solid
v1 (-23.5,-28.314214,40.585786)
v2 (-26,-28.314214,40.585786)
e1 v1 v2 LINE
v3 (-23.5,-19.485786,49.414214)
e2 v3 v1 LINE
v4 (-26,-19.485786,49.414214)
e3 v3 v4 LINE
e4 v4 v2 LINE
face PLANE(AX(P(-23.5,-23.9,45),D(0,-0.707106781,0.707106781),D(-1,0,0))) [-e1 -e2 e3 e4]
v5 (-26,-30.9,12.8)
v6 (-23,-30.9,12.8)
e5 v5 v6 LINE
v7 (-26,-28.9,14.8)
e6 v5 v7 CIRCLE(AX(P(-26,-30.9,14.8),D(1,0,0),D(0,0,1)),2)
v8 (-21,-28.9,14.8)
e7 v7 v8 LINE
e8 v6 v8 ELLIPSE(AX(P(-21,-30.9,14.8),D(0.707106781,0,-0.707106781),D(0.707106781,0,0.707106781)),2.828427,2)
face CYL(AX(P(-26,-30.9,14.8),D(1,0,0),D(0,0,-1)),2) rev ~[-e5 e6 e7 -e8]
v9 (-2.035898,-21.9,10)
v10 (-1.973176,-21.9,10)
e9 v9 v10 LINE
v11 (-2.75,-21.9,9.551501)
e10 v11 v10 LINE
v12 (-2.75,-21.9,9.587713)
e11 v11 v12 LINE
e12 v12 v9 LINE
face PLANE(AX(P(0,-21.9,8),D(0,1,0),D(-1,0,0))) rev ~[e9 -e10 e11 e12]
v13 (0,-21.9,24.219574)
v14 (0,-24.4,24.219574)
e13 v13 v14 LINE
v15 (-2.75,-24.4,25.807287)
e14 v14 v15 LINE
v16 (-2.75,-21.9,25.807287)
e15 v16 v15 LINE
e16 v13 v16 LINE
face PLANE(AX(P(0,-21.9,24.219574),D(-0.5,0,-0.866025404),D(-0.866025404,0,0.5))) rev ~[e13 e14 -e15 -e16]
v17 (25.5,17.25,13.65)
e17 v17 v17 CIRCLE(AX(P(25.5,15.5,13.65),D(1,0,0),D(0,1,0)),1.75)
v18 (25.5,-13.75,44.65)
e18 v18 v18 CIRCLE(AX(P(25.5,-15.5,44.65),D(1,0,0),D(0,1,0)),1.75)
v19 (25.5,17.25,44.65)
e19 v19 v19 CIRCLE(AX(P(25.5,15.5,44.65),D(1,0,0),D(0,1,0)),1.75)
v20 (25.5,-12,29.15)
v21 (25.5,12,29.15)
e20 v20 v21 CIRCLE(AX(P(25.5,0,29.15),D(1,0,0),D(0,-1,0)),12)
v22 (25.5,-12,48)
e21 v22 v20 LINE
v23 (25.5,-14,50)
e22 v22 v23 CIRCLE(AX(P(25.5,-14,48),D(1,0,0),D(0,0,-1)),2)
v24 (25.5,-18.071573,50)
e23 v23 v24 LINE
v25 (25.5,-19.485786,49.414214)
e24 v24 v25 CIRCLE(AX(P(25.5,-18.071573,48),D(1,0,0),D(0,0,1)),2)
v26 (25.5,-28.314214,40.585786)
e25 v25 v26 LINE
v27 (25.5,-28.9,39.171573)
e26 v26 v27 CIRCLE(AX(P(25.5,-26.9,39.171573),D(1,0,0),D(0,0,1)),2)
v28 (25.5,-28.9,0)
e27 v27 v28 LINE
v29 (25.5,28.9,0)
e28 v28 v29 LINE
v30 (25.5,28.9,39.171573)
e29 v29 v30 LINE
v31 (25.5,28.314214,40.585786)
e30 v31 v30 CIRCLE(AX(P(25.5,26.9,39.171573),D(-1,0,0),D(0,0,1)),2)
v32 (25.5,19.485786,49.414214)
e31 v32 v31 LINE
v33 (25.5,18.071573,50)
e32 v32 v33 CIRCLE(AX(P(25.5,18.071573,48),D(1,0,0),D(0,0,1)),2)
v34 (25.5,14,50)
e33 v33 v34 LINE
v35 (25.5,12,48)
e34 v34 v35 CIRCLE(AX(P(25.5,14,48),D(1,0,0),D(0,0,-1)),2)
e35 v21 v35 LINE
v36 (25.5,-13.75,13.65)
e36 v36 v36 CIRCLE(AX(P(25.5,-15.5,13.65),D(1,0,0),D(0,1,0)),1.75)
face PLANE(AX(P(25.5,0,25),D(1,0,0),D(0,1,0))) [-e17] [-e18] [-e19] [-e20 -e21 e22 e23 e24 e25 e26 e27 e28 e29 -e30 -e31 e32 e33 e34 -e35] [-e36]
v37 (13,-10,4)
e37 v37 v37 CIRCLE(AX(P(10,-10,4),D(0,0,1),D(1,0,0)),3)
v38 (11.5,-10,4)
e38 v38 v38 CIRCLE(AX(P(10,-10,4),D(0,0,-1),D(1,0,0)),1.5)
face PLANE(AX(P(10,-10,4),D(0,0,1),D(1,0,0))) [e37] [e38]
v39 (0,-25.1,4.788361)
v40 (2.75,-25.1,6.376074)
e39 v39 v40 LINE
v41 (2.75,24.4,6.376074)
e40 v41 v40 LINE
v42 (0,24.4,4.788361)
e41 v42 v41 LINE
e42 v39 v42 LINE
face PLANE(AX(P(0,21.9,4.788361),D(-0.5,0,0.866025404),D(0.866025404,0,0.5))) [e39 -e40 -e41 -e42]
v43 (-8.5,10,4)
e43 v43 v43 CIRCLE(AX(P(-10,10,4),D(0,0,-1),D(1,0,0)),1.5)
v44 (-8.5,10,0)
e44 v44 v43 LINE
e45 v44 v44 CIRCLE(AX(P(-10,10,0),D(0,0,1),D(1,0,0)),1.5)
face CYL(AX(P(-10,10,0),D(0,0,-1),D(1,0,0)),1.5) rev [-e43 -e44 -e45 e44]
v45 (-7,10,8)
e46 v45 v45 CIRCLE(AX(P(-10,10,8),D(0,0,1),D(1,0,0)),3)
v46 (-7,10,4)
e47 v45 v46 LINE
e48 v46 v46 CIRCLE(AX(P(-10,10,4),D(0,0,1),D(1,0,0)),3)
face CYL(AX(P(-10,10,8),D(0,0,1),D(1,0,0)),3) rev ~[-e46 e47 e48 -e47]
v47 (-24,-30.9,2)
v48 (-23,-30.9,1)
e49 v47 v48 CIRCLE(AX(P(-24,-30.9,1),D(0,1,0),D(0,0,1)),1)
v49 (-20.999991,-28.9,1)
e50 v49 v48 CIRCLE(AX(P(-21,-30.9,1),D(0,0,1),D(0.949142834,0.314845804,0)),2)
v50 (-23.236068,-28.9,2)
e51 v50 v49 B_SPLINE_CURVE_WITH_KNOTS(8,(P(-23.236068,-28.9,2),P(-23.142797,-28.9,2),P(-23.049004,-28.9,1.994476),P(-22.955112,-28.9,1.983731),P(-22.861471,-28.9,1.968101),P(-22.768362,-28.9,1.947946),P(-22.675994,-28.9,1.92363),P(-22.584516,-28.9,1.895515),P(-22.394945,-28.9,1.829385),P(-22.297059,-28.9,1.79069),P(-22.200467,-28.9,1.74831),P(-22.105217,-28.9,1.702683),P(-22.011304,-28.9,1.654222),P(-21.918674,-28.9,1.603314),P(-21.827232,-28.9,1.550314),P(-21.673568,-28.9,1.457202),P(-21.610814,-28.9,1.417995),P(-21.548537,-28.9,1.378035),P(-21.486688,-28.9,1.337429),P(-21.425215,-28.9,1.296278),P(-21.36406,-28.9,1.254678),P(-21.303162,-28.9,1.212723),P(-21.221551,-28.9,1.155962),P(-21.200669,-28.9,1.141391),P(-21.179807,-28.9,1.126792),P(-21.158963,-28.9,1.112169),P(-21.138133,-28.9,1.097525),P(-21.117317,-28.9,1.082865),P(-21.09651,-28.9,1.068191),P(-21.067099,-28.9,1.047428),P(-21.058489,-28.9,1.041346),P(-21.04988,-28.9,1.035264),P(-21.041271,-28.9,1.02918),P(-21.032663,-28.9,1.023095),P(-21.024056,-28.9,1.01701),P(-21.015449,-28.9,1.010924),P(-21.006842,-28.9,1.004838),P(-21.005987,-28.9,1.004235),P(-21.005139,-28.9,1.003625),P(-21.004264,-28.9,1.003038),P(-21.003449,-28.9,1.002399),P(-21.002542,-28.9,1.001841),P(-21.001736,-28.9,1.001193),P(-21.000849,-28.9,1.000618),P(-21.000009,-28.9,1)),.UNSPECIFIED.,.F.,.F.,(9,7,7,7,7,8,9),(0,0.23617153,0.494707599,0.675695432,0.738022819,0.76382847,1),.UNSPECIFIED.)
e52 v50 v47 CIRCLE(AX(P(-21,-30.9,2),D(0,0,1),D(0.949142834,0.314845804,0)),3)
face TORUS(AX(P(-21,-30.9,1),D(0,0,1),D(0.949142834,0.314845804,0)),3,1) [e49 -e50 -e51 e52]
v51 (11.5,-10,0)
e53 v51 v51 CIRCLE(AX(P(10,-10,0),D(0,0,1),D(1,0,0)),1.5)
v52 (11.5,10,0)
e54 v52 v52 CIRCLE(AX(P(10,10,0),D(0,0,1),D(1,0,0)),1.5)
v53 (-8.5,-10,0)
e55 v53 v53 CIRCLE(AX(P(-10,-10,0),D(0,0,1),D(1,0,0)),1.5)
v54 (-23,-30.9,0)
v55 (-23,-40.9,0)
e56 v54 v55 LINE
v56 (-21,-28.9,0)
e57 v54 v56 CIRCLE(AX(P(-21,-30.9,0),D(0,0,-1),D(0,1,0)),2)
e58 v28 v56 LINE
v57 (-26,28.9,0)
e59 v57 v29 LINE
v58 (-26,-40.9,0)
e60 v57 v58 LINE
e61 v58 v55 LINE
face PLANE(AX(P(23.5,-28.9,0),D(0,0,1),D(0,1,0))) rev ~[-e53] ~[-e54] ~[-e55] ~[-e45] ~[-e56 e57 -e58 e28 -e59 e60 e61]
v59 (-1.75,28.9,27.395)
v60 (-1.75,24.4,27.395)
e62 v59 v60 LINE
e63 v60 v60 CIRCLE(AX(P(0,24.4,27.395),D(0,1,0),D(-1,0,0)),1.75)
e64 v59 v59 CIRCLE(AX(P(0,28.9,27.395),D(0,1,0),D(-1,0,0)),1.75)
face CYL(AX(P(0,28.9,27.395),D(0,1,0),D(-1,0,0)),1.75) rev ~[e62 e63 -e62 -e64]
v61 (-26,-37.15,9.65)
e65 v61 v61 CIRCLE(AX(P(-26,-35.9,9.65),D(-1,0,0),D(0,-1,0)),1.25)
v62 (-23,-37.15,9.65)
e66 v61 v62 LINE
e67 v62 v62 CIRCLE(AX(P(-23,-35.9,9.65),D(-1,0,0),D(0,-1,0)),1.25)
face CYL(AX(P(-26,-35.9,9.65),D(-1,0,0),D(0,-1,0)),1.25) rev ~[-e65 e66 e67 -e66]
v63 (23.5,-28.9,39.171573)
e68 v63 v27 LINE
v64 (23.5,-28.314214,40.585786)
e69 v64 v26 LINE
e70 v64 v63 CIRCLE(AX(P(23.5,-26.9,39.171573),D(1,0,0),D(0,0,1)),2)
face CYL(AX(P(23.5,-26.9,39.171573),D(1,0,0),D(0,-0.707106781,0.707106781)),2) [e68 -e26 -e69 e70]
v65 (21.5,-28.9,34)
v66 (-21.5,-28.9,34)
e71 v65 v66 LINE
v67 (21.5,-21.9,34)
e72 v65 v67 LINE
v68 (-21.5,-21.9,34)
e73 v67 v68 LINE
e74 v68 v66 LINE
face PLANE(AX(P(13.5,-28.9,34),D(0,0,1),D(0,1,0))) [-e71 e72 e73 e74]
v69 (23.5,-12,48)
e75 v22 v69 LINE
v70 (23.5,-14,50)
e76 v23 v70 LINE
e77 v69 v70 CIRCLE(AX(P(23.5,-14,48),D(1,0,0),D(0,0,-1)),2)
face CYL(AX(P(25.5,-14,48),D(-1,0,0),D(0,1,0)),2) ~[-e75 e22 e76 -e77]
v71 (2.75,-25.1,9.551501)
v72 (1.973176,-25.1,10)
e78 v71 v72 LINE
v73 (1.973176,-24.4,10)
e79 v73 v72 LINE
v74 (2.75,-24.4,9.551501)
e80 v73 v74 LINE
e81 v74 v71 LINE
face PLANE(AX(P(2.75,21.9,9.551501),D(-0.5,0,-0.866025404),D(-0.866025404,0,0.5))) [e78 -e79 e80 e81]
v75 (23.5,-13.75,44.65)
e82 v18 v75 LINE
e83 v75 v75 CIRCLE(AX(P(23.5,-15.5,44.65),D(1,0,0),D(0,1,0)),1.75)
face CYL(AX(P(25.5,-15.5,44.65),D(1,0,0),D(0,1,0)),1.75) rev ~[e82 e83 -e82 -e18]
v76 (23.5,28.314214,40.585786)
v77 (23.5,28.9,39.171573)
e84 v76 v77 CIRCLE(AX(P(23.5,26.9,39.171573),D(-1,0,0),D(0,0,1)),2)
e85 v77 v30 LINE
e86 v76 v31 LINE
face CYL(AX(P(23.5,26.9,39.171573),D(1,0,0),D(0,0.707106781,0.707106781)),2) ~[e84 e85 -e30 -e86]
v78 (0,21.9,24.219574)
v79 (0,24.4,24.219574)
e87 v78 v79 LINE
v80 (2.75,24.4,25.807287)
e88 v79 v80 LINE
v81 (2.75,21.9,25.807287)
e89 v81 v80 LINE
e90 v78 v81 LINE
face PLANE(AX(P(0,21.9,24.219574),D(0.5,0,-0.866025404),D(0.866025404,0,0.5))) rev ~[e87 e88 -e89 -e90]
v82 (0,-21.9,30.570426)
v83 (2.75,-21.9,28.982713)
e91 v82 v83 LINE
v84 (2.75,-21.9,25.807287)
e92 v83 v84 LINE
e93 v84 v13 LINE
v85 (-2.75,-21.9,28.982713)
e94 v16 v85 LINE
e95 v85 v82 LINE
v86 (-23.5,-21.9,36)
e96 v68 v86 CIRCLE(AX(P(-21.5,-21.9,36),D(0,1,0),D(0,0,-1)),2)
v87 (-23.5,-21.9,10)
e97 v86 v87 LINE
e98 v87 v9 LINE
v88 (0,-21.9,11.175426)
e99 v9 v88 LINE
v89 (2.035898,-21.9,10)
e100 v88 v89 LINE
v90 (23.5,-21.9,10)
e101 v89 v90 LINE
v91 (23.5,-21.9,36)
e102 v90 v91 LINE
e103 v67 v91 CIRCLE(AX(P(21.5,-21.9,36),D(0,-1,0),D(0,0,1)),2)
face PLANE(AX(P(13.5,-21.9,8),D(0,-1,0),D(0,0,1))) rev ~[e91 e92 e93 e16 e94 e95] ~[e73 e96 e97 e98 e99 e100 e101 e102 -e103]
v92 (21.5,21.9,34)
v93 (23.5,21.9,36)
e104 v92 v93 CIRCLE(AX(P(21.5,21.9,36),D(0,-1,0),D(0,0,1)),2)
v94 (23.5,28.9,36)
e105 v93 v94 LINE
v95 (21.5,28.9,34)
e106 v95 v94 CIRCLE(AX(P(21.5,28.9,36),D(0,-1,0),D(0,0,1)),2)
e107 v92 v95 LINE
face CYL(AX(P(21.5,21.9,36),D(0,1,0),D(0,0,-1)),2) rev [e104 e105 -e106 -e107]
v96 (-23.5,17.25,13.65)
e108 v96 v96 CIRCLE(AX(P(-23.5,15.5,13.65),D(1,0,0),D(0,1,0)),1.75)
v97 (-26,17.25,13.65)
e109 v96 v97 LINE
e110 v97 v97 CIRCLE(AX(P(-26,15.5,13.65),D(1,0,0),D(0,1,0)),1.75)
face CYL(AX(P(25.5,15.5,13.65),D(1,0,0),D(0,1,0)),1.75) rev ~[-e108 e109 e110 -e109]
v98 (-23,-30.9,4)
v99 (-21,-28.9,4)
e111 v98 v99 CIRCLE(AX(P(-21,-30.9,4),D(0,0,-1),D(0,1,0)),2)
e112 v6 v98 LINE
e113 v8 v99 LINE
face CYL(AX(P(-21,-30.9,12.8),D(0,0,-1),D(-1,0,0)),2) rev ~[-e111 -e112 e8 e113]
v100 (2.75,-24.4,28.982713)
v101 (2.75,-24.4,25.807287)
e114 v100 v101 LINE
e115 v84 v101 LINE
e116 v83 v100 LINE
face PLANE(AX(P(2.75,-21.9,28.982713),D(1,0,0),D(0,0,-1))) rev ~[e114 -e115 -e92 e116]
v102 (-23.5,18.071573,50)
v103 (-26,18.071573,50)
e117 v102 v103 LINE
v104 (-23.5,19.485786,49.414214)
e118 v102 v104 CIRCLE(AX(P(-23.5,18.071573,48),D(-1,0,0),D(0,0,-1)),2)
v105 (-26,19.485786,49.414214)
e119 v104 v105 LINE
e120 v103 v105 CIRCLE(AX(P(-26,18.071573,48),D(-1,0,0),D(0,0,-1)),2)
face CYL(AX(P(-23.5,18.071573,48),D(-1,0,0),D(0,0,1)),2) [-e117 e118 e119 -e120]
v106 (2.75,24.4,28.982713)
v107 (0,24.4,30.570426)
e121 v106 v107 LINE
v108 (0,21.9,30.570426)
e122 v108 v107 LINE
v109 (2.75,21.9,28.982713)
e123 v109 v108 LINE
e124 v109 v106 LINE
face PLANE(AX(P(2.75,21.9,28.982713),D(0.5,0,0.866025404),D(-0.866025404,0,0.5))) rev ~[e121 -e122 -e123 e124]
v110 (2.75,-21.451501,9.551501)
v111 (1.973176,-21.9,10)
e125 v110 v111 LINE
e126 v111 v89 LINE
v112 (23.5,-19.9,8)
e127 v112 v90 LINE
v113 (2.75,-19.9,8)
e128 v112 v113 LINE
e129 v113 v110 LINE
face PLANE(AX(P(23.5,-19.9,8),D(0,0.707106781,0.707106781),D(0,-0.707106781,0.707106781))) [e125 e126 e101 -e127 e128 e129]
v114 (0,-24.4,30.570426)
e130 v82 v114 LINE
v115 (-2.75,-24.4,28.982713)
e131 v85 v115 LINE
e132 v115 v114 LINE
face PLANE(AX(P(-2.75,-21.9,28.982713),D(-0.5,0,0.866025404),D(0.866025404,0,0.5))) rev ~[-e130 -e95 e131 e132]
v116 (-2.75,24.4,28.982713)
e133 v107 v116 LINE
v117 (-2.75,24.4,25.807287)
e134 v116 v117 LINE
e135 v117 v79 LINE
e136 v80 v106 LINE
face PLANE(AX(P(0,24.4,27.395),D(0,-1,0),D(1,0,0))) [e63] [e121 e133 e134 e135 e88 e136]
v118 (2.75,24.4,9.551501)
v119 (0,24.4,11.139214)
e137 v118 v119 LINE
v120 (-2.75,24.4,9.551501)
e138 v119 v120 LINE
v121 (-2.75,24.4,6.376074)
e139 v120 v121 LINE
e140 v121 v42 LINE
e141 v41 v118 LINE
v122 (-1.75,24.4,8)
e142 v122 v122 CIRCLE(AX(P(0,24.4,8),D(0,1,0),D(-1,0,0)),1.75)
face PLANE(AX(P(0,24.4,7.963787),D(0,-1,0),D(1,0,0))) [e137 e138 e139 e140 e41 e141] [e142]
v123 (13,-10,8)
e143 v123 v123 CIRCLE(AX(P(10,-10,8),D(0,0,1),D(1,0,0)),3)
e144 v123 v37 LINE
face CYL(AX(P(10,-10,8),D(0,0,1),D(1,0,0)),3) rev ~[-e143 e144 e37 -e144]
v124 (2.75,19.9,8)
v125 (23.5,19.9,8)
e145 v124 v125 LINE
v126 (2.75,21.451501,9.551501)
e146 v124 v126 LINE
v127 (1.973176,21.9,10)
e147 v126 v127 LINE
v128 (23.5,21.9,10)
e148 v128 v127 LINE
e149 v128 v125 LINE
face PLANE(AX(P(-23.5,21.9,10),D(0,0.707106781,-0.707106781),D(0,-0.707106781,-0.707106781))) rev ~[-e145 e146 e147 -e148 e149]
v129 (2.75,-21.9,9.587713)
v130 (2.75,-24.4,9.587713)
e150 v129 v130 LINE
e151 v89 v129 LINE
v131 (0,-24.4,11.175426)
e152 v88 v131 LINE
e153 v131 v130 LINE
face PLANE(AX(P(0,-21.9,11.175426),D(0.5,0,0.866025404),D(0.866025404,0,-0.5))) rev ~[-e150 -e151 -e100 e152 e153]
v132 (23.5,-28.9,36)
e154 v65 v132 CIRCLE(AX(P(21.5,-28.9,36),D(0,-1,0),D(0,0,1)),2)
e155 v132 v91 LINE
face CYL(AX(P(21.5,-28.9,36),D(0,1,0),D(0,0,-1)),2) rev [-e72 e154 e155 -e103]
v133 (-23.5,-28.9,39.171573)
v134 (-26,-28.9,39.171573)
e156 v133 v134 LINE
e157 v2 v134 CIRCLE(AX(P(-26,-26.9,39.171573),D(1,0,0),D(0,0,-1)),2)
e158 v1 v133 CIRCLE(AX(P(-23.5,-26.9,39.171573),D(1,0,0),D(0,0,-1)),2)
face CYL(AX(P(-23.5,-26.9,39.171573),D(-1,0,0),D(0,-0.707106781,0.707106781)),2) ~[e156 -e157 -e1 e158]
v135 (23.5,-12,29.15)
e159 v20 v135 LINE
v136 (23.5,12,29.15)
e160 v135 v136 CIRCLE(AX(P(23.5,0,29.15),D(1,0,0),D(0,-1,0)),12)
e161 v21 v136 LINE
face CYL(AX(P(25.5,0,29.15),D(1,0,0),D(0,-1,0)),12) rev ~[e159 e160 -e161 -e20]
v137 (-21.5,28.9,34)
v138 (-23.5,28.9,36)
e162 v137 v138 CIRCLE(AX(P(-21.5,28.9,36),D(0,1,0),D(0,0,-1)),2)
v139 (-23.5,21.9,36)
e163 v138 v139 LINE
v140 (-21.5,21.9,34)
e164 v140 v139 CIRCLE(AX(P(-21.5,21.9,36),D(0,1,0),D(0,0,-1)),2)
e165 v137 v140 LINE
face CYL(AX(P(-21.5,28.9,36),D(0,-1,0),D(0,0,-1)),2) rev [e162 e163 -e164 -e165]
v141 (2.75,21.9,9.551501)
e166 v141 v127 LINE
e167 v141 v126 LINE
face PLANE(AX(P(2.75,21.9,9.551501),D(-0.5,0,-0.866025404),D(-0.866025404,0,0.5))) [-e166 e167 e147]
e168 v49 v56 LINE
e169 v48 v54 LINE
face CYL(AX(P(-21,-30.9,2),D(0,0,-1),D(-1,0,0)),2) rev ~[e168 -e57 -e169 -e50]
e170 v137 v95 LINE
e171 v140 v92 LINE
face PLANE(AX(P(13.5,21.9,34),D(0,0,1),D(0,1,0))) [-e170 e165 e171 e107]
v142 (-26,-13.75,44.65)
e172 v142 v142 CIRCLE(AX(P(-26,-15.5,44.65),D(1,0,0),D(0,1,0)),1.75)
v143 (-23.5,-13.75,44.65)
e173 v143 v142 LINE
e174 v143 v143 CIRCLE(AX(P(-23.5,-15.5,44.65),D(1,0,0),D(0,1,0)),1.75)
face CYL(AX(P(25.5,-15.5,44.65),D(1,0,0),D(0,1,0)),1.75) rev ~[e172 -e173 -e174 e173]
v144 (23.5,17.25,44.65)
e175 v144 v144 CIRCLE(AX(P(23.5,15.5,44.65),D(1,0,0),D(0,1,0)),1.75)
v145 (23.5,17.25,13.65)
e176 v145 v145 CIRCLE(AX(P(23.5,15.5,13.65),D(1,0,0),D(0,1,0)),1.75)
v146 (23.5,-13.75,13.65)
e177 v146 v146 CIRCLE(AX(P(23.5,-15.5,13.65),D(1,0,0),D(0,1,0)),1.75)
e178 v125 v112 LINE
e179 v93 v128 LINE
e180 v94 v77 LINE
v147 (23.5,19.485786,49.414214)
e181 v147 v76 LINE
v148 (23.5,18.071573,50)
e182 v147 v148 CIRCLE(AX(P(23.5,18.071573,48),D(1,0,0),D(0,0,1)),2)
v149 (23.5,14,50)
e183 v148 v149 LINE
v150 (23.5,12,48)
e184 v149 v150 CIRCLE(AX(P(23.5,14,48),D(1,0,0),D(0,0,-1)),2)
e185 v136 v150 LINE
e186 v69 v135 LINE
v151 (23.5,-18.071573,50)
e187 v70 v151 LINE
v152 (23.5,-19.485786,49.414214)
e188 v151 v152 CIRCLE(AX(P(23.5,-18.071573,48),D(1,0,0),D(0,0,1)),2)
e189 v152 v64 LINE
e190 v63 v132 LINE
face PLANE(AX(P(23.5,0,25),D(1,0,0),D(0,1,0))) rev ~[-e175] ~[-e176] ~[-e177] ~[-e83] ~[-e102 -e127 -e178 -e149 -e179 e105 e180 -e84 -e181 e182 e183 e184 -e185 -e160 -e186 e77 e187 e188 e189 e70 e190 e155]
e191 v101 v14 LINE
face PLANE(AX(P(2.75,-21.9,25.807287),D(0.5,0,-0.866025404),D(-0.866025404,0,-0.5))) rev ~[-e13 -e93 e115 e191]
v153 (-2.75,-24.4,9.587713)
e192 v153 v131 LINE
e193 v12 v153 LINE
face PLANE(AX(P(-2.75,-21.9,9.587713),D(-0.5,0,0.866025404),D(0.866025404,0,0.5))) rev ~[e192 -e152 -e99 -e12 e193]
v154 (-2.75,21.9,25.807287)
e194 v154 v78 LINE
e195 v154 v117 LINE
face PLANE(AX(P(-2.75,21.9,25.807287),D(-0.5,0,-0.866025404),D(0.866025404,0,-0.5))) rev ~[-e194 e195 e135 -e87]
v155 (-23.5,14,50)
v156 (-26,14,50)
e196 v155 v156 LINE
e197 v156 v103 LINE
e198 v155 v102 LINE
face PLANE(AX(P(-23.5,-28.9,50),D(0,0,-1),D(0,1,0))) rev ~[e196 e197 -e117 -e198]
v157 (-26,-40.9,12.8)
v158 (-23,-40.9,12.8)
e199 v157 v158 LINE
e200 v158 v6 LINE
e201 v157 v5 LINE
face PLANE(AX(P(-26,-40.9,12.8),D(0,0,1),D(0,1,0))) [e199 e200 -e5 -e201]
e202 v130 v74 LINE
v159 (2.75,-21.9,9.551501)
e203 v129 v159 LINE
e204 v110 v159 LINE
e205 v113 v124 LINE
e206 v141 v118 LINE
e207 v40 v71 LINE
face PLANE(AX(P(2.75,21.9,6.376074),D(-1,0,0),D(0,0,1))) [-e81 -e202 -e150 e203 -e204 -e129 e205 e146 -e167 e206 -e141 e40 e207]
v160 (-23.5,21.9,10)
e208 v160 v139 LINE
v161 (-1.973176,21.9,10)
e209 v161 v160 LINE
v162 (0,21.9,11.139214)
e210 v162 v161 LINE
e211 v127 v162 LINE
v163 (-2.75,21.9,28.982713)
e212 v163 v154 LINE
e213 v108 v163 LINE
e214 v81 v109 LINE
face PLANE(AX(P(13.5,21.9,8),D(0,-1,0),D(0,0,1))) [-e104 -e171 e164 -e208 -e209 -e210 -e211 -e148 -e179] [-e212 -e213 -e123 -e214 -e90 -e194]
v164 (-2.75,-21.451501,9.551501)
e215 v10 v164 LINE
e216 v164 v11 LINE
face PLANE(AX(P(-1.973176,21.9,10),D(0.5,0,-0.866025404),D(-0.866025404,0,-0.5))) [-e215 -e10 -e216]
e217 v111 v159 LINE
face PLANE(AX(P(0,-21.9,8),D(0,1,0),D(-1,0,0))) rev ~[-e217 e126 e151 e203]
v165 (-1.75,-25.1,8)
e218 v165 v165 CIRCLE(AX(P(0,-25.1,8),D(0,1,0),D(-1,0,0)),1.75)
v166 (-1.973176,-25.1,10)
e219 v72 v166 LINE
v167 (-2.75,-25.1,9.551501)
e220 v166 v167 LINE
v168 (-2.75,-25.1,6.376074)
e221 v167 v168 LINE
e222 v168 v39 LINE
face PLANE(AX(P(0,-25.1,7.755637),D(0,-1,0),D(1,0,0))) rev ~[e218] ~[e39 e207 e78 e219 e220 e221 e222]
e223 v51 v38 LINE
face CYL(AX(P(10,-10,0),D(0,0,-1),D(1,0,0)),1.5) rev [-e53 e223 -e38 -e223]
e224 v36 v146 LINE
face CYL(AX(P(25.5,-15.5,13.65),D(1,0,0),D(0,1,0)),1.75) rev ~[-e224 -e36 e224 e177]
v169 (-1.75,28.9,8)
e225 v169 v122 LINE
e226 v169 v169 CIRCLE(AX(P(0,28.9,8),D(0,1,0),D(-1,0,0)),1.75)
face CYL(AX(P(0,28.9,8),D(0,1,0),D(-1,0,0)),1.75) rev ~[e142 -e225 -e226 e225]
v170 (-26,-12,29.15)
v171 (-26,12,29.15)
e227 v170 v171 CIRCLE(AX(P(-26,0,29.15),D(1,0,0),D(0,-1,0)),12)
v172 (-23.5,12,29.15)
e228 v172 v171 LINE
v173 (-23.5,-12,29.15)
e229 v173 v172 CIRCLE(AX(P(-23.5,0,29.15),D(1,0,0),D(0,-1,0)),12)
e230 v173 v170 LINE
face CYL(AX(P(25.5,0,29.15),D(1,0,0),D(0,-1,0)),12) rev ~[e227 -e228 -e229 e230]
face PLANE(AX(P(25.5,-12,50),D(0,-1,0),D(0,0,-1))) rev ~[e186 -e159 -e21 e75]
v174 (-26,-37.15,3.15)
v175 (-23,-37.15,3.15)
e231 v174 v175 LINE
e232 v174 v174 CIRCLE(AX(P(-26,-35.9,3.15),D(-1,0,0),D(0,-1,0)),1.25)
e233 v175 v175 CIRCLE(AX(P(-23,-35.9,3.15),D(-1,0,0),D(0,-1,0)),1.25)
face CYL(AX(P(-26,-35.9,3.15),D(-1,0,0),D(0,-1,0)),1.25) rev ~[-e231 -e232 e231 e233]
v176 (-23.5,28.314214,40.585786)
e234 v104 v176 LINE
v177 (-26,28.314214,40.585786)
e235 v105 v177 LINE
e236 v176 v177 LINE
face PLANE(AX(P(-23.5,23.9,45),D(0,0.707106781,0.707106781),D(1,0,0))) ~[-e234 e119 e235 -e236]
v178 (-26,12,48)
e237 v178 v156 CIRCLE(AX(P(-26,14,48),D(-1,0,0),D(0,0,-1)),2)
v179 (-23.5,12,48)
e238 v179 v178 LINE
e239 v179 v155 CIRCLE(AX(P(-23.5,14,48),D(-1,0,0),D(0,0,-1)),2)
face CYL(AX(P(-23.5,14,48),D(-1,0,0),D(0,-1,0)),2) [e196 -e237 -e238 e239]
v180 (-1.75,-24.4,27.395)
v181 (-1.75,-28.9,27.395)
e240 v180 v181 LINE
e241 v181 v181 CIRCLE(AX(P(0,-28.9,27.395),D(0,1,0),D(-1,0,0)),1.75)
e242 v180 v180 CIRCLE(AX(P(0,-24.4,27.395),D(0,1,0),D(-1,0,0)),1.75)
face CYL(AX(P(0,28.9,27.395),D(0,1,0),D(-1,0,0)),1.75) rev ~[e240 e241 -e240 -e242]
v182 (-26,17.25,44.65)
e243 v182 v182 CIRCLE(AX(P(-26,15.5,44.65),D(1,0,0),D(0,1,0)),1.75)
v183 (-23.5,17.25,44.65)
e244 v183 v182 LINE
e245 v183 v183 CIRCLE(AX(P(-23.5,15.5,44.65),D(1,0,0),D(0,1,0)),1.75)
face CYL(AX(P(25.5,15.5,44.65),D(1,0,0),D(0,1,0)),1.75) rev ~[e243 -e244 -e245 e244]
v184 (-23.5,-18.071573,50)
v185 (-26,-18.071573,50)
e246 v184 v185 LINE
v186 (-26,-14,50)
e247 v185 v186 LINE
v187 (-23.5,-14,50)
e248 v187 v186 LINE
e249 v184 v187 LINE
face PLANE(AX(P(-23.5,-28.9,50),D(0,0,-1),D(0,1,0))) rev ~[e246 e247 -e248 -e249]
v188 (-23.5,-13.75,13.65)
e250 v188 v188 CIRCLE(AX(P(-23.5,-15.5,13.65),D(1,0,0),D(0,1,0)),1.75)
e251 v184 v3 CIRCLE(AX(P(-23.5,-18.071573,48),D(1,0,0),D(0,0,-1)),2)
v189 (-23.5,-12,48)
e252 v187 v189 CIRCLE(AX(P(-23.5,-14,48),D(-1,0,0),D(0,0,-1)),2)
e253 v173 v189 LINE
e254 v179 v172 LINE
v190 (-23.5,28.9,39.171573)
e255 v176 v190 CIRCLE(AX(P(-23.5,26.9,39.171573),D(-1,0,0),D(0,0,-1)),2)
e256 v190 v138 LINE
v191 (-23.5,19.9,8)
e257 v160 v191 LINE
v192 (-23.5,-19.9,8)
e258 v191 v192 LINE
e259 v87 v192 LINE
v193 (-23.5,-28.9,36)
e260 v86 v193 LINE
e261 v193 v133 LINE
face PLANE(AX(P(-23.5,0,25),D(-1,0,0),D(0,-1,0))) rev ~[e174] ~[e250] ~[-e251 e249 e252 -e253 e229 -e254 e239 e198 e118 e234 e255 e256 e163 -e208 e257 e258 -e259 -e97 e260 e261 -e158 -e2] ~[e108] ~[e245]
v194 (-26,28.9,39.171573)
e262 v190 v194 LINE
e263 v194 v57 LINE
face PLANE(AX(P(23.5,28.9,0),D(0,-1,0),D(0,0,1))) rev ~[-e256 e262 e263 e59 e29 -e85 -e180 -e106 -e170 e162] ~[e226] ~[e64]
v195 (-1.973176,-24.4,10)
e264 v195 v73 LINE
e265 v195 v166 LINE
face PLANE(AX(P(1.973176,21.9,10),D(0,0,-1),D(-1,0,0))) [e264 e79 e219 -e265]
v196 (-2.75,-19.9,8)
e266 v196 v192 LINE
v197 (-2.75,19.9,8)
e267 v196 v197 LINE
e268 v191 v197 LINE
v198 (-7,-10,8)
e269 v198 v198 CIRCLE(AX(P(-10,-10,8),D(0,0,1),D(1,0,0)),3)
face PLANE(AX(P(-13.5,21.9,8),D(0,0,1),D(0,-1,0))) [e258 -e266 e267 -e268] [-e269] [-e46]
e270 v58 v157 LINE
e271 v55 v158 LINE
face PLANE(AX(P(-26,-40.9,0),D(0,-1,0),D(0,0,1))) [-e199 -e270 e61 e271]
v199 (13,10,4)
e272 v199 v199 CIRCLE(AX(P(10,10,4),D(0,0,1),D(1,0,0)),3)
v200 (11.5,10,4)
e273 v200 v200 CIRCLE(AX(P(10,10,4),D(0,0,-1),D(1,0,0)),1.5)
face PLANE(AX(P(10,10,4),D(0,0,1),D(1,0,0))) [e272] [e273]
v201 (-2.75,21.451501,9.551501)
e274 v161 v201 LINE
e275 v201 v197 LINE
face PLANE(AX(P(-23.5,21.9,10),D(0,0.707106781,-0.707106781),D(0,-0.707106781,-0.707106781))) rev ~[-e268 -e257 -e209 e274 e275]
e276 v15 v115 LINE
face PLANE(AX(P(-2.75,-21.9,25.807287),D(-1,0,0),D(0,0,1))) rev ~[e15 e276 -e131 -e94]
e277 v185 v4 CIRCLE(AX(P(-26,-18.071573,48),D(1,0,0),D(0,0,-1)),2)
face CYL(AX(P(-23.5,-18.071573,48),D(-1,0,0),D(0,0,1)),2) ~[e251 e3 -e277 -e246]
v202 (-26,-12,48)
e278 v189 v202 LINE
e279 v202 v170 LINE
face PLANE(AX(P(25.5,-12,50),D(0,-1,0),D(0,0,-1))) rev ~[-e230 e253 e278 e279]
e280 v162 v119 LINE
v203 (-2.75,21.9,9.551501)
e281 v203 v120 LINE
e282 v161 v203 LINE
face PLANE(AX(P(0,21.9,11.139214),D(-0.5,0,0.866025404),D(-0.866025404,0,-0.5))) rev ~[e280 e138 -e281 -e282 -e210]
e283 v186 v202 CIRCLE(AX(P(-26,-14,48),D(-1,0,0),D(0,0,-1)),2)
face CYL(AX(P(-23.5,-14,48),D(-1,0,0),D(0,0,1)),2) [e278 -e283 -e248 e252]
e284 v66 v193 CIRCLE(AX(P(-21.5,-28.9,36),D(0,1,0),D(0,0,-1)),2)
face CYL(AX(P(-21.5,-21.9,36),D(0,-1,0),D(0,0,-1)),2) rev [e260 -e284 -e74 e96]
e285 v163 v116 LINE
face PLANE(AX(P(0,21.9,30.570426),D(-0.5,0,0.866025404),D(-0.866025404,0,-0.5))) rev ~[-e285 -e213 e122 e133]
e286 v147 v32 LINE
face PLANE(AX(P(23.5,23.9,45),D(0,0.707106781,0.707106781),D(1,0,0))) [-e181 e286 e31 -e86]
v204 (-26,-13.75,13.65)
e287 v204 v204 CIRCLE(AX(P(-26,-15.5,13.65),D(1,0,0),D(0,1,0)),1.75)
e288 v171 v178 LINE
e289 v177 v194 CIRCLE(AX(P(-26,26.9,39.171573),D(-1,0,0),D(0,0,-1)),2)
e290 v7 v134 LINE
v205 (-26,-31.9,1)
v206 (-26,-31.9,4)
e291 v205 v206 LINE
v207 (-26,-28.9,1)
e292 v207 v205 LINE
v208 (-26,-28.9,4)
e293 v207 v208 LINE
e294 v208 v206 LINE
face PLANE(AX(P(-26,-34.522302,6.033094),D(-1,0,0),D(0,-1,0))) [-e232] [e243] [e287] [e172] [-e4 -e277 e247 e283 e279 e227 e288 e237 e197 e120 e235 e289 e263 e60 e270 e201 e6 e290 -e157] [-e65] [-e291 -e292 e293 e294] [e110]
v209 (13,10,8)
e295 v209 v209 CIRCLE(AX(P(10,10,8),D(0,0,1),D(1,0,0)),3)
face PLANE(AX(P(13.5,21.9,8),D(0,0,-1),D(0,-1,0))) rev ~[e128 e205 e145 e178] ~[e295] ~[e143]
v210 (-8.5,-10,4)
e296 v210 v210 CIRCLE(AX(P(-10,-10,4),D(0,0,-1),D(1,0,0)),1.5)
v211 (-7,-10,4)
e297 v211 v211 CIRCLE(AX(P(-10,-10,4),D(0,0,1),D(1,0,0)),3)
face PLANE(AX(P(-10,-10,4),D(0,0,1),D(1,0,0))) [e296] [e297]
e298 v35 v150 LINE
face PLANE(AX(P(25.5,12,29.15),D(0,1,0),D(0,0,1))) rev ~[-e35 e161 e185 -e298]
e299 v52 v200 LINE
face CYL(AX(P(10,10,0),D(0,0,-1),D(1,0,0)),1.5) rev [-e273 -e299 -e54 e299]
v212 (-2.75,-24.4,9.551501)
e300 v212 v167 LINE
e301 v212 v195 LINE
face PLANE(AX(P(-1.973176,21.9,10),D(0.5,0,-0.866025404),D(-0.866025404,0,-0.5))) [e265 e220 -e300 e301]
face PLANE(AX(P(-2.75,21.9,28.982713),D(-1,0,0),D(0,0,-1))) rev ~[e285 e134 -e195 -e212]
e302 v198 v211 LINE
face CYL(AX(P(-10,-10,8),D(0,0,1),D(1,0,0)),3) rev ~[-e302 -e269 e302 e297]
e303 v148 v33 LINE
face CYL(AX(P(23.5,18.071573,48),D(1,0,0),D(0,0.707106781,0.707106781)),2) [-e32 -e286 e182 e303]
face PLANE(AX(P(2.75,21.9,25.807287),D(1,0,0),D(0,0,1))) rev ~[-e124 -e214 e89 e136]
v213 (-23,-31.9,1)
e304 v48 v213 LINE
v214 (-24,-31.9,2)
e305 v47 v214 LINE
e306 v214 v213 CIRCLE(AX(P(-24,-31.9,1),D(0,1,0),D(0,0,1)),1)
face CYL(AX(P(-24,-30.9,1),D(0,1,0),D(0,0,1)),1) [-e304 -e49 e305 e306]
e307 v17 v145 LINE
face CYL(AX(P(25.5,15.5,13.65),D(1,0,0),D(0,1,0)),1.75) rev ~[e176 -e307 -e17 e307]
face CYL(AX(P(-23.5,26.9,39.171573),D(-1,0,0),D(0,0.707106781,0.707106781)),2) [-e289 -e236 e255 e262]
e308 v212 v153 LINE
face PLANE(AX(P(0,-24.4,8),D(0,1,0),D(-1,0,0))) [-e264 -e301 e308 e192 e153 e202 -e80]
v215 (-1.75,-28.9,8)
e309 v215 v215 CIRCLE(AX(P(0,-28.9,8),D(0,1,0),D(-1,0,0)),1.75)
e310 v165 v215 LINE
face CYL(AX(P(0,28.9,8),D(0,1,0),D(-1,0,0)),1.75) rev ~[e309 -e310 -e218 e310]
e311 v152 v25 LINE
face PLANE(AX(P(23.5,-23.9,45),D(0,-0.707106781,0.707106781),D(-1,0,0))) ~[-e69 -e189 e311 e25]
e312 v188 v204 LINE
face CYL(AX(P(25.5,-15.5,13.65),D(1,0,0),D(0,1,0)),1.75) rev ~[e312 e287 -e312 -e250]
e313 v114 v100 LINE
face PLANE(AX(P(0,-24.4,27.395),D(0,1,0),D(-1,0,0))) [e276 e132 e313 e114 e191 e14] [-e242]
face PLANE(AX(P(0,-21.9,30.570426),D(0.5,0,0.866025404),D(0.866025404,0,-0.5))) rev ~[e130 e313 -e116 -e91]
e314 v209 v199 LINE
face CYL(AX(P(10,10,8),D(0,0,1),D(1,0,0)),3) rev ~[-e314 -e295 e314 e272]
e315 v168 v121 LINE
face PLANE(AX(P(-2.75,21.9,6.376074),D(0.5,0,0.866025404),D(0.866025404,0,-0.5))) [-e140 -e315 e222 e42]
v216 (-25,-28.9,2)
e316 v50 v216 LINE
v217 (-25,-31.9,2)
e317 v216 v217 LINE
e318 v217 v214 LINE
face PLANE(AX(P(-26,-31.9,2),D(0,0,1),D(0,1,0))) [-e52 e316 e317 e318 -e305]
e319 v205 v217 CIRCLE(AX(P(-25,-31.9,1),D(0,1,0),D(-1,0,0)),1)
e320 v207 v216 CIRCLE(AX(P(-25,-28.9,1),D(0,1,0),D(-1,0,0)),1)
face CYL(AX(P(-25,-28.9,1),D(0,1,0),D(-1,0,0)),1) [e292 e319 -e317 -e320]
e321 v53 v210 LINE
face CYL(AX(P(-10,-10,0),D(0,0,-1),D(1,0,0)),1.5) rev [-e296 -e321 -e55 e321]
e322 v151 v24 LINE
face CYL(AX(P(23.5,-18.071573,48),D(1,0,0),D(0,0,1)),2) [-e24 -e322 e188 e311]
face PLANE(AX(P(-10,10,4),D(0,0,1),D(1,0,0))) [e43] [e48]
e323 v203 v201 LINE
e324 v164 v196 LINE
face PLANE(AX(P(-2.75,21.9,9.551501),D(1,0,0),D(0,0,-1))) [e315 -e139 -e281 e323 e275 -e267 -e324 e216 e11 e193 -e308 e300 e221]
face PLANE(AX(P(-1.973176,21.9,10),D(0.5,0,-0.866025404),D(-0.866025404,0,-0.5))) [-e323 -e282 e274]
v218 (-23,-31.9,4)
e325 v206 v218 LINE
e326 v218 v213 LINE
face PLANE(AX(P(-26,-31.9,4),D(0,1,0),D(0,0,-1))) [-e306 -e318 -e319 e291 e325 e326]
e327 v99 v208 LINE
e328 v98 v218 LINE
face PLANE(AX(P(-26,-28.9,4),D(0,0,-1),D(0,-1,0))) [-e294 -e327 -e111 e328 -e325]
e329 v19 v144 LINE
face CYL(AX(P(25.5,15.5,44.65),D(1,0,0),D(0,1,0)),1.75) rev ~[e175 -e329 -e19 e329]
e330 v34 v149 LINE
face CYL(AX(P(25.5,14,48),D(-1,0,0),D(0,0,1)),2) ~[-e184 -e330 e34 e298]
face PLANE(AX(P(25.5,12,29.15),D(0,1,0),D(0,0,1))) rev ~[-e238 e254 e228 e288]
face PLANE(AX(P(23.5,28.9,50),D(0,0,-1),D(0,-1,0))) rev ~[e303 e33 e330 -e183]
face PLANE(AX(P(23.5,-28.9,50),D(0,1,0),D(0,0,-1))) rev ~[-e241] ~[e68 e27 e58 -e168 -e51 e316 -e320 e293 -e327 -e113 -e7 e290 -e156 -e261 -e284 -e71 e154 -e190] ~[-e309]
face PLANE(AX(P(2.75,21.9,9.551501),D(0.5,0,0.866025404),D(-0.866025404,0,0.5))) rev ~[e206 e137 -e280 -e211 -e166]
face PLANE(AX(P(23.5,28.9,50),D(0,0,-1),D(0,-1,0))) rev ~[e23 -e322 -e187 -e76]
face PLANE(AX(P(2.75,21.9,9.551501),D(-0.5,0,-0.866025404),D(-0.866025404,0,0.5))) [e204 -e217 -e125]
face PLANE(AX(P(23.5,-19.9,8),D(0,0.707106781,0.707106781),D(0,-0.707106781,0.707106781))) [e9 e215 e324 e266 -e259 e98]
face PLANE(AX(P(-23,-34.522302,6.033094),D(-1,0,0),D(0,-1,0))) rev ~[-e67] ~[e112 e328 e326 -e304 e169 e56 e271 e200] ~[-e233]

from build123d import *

# Parameters (mm, degrees)
F1_W         = 27
F1_H         = 43.8
F1_R         = 1.5
F1_H_2       = 7
F2_DEPTH     = 34
F3_R         = 1.75
F4_DEPTH     = 57.801
F5_W         = 43.8
F5_H         = 26
F6_DEPTH     = 27.001
F7_DEPTH     = 10
F8_DEPTH     = 10
F9_T4_DEPTH  = 26.8933659759
F9_S5_R      = 1.75
F9_T6_DEPTH  = 15
F9_T10_DEPTH = 26.8933659759
F9_S11_R     = 1.75
F9_T12_DEPTH = 15
F9_T16_DEPTH = 26.8933659759
F9_S17_R     = 1.75
F9_T18_DEPTH = 15
F9_T22_DEPTH = 26.8933659759
F9_S23_R     = 1.75
F9_T24_DEPTH = 15
F12_DEPTH    = 2.5
F14_DEPTH    = 2
F15_SIZE     = 10
F16_R        = 1.75
F17_DEPTH    = 51.5
F18_R        = 3
F19_DEPTH    = 4
F21_DEPTH    = 2.5
F22_DEPTH    = 47
F24_DEPTH    = 2.5
F25_R        = 1.25
F26_DEPTH    = 3
F27_R        = 2
F28_T1_DEPTH = 1
F28_T3_DEPTH = 3
F28_T8_ANGLE = 161.6484946187


# Not quite as in the source:
# - a fillet or chamfer that OpenCascade refuses, or shapes differently, is made with other operations: its cross-section is extruded or revolved along the edge and cut away or added


with BuildPart() as f2:
    # F1 (on Top) → F2 (new body)
    with BuildSketch(Plane.XY):
        Rectangle(F1_W, F1_H)
        with Locations((-10, -10)):
            Circle(F1_R, mode=Mode.SUBTRACT)
        with Locations((10, -10)):
            Circle(F1_R, mode=Mode.SUBTRACT)
        with Locations((-10, 10)):
            Circle(F1_R, mode=Mode.SUBTRACT)
        with Locations((10, 10)):
            Circle(F1_R, mode=Mode.SUBTRACT)
        with Locations((0, 25.4)):
            Rectangle(F1_W, F1_H_2)
        with Locations((0, -25.4)):
            Rectangle(F1_W, F1_H_2)
    extrude(amount=F2_DEPTH)

    # F3 (on face) → F4 (cut, through all)
    with BuildSketch(Plane(origin=(0, 28.9, 0), x_dir=(-1, 0, 0), z_dir=(0, 1, 0))):
        with Locations((0, 27.395)):
            Circle(F3_R)
        with Locations((0, 8)):
            Circle(F3_R)
    extrude(amount=-F4_DEPTH, mode=Mode.SUBTRACT)

    # F5 (on face) → F6 (cut, through all)
    with BuildSketch(Plane(origin=(-13.5, 0, 0), x_dir=(0, -1, 0), z_dir=(-1, 0, 0))):
        with Locations((0, 21)):
            Rectangle(F5_W, F5_H)
    extrude(amount=-F6_DEPTH, mode=Mode.SUBTRACT)

    # F7 (add): a face of the model
    f7_faces = [f2.faces().sort_by_distance(p)[0] for p in [
        (-13.5, 0, 0.6705848194),
    ]]
    extrude(f7_faces, amount=F7_DEPTH)

    # F8 (add): a face of the model
    f8_faces = [f2.faces().sort_by_distance(p)[0] for p in [
        (13.5, 0, 0.6705848194),
    ]]
    extrude(f8_faces, amount=F8_DEPTH)

    # F9: chamfer of 2 on 4 edges, made by hand


with BuildPart() as f9_tool2:
    # F9_s3 → F9_t4 (new body)
    with BuildSketch(Plane.YZ.offset(3.3933659759)):
        Polygon((-21.9, 10), (-19.9, 8), (-21.9, 8), align=None)
    extrude(amount=-F9_T4_DEPTH)

    # F9_s5 → F9_t6 (cut, symmetric)
    with BuildSketch(Plane.XZ.offset(20.9)):
        with Locations((0, 8)):
            Circle(F9_S5_R)
    extrude(amount=F9_T6_DEPTH, both=True, mode=Mode.SUBTRACT)


with BuildPart() as f2_1:
    add(f2.part)

    # F9_t1: union F9_tool2
    add(f9_tool2.part)


with BuildPart() as f9_tool8:
    # F9_s9 → F9_t10 (new body)
    with BuildSketch(Plane.YZ.offset(-23.5)):
        Polygon((21.9, 10), (19.9, 8), (21.9, 8), align=None)
    extrude(amount=F9_T10_DEPTH)

    # F9_s11 → F9_t12 (cut, symmetric)
    with BuildSketch(Plane.XZ.offset(-20.9)):
        with Locations((0, 8)):
            Circle(F9_S11_R)
    extrude(amount=F9_T12_DEPTH, both=True, mode=Mode.SUBTRACT)


with BuildPart() as f2_2:
    add(f2_1.part)

    # F9_t7: union F9_tool8
    add(f9_tool8.part)


with BuildPart() as f9_tool14:
    # F9_s15 → F9_t16 (new body)
    with BuildSketch(Plane.YZ.offset(-3.3933659759)):
        Polygon((21.9, 10), (19.9, 8), (21.9, 8), align=None)
    extrude(amount=F9_T16_DEPTH)

    # F9_s17 → F9_t18 (cut, symmetric)
    with BuildSketch(Plane.XZ.offset(-20.9)):
        with Locations((0, 8)):
            Circle(F9_S17_R)
    extrude(amount=F9_T18_DEPTH, both=True, mode=Mode.SUBTRACT)


with BuildPart() as f2_3:
    add(f2_2.part)

    # F9_t13: union F9_tool14
    add(f9_tool14.part)


with BuildPart() as f9_tool20:
    # F9_s21 → F9_t22 (new body)
    with BuildSketch(Plane.YZ.offset(23.5)):
        Polygon((-19.9, 8), (-21.9, 10), (-21.9, 8), align=None)
    extrude(amount=-F9_T22_DEPTH)

    # F9_s23 → F9_t24 (cut, symmetric)
    with BuildSketch(Plane.XZ.offset(20.9)):
        with Locations((0, 8)):
            Circle(F9_S23_R)
    extrude(amount=F9_T24_DEPTH, both=True, mode=Mode.SUBTRACT)


with BuildPart() as f2_4:
    add(f2_3.part)

    # F9_t19: union F9_tool20
    add(f9_tool20.part)

    # F11 (on face) → F12 (join)
    with BuildSketch(Plane(origin=(-23.5, 0, 0), x_dir=(0, -1, 0), z_dir=(-1, 0, 0))):
        Polygon((-28.9, 50), (-28.9, 34), (-28.9, 0), (28.9, 0), (28.9, 50), align=None)
    extrude(amount=F12_DEPTH)

    # F13 (on face) → F14 (join)
    with BuildSketch(Plane.YZ.offset(23.5)):
        Polygon((-28.9, 34), (-28.9, 28), (-28.9, 0), (28.9, 0), (28.9, 28), (28.9, 34), (28.9, 50), (-28.9, 50), align=None)
    extrude(amount=F14_DEPTH)

    # F15
    f15_edges = [f2_4.edges().sort_by_distance(p)[0] for p in [
        (-24.75, 28.9, 50),
        (-24.75, -28.9, 50),
        (24.5, -28.9, 50),
        (24.5, 28.9, 50),
    ]]
    chamfer(f15_edges, length=F15_SIZE)

    # F16 (on face) → F17 (cut, through all)
    with BuildSketch(Plane.YZ.offset(25.5)):
        with BuildLine():
            Line((-12, 50), (-12, 29.15))
            ThreePointArc((-12, 29.15), (0, 17.15), (12, 29.15))
            Line((12, 29.15), (12, 50))
            Line((12, 50), (-12, 50))
        make_face()
        with Locations((-15.5, 44.65)):
            Circle(F16_R)
        with Locations((15.5, 44.65)):
            Circle(F16_R)
        with Locations((15.5, 13.65)):
            Circle(F16_R)
        with Locations((-15.5, 13.65)):
            Circle(F16_R)
    extrude(amount=-F17_DEPTH, mode=Mode.SUBTRACT)

    # F18 (on face) → F19 (cut)
    with BuildSketch(Plane.XY.offset(8)):
        with Locations((10, -10)):
            Circle(F18_R)
        with Locations((10, 10)):
            Circle(F18_R)
        with Locations((-10, -10)):
            Circle(F18_R)
        with Locations((-10, 10)):
            Circle(F18_R)
    extrude(amount=-F19_DEPTH, mode=Mode.SUBTRACT)

    # F20 (on face) → F21 (cut)
    with BuildSketch(Plane.XZ.offset(-21.9)):
        Polygon((2.75, 25.8072867597), (2.75, 28.9827132403), (0, 30.5704264805), (-2.75, 28.9827132403), (-2.75, 25.8072867597), (0, 24.2195735195), align=None)
        Polygon((2.75, 6.3760742294), (2.75, 9.55150071), (0, 11.1392139502), (-2.75, 9.55150071), (-2.75, 6.3760742294), (0, 4.7883609892), align=None)
    extrude(amount=-F21_DEPTH, mode=Mode.SUBTRACT)

    # F20 (on face) → F22 (cut)
    with BuildSketch(Plane.XZ.offset(-21.9)):
        Polygon((2.75, 6.3760742294), (2.75, 9.55150071), (1.9731764425, 10), (-1.9731764425, 10), (-2.75, 9.55150071), (-2.75, 6.3760742294), (0, 4.7883609892), align=None)
    extrude(amount=F22_DEPTH, mode=Mode.SUBTRACT)

    # F23 (on face) → F24 (cut)
    with BuildSketch(Plane(origin=(0, -21.9, 0), x_dir=(-1, 0, 0), z_dir=(0, 1, 0))):
        Polygon((2.75, 25.8072867597), (2.75, 28.9827132403), (0, 30.5704264805), (-2.75, 28.9827132403), (-2.75, 25.8072867597), (0, 24.2195735195), align=None)
        Polygon((2.75, 6.4122867597), (2.75, 9.5877132403), (0, 11.1754264805), (-2.75, 9.5877132403), (-2.75, 6.4122867597), (0, 4.8245735195), align=None)
    extrude(amount=-F24_DEPTH, mode=Mode.SUBTRACT)

    # F25 (on face) → F26 (join)
    with BuildSketch(Plane(origin=(-26, 0, 0), x_dir=(0, -1, 0), z_dir=(-1, 0, 0))):
        Polygon((28.9, 2), (28.9, 0), (40.9, 0), (40.9, 12.8), (28.9, 12.8), (28.9, 4), (31.9, 4), (31.9, 2), align=None)
        with Locations((35.9, 3.15)):
            Circle(F25_R, mode=Mode.SUBTRACT)
        with Locations((35.9, 9.65)):
            Circle(F25_R, mode=Mode.SUBTRACT)
    extrude(amount=-F26_DEPTH)

    # F27
    f27_edges = [f2_4.edges().sort_by_distance(p)[0] for p in [
        (-24.5, -28.9, 12.8),
        (23.5, -25.4, 34),
        (-23.5, -25.4, 34),
        (-23.5, 25.4, 34),
        (23.5, 25.4, 34),
        (-23, -28.9, 8.4),
        (-23, -28.9, 1),
        (24.5, 28.9, 40),
        (-24.75, 28.9, 40),
        (-24.75, 18.9, 50),
        (-24.75, -12, 50),
        (-24.75, 12, 50),
        (-24.75, -18.9, 50),
        (24.5, -12, 50),
        (24.5, 12, 50),
        (24.5, -18.9, 50),
        (24.5, -28.9, 40),
        (-24.75, -28.9, 40),
        (24.5, 18.9, 50),
    ]]
    fillet(f27_edges, radius=F27_R)

    # F28: fillet of radius 1 on 3 edges, made by hand

    # F28_s2 → F28_t1 (cut)
    with BuildSketch(Plane.XZ.offset(30.9)):
        with BuildLine():
            ThreePointArc((-24, 2), (-23.2928932188, 1.7071067812), (-23, 1))
            Line((-23, 1), (-23, 2))
            Line((-23, 2), (-24, 2))
        make_face()
    extrude(amount=F28_T1_DEPTH, mode=Mode.SUBTRACT)

    # F28_s4 → F28_t3 (cut)
    with BuildSketch(Plane.XZ.offset(28.9)):
        with BuildLine():
            ThreePointArc((-26, 1), (-25.7071067812, 1.7071067812), (-25, 2))
            Line((-25, 2), (-26, 2))
            Line((-26, 2), (-26, 1))
        make_face()
    extrude(amount=F28_T3_DEPTH, mode=Mode.SUBTRACT)


with BuildPart() as f28_tool6:
    # F28_s7 → F28_t8 (revolve)
    with BuildSketch(Plane(origin=(7.1522739521, -21.561442082, 0), x_dir=(0, 0, 1), z_dir=(0.3148458041, -0.9491428342, 0))):
        with BuildLine():
            ThreePointArc((2, 26.6607348638), (1.7071067812, 27.367841645), (1, 27.6607348638))
            Line((1, 27.6607348638), (2, 27.6607348638))
            Line((2, 27.6607348638), (2, 26.6607348638))
        make_face()
    revolve(axis=Axis((-21, -30.9, 2), (0, 0, 1)), revolution_arc=F28_T8_ANGLE)

    split(bisect_by=Plane.XZ.offset(28.9), keep=Keep.TOP)


with BuildPart() as f2_5:
    add(f2_4.part)

    # F28_t5: cut F28_tool6
    add(f28_tool6.part, mode=Mode.SUBTRACT)


solid = f2_5.part
